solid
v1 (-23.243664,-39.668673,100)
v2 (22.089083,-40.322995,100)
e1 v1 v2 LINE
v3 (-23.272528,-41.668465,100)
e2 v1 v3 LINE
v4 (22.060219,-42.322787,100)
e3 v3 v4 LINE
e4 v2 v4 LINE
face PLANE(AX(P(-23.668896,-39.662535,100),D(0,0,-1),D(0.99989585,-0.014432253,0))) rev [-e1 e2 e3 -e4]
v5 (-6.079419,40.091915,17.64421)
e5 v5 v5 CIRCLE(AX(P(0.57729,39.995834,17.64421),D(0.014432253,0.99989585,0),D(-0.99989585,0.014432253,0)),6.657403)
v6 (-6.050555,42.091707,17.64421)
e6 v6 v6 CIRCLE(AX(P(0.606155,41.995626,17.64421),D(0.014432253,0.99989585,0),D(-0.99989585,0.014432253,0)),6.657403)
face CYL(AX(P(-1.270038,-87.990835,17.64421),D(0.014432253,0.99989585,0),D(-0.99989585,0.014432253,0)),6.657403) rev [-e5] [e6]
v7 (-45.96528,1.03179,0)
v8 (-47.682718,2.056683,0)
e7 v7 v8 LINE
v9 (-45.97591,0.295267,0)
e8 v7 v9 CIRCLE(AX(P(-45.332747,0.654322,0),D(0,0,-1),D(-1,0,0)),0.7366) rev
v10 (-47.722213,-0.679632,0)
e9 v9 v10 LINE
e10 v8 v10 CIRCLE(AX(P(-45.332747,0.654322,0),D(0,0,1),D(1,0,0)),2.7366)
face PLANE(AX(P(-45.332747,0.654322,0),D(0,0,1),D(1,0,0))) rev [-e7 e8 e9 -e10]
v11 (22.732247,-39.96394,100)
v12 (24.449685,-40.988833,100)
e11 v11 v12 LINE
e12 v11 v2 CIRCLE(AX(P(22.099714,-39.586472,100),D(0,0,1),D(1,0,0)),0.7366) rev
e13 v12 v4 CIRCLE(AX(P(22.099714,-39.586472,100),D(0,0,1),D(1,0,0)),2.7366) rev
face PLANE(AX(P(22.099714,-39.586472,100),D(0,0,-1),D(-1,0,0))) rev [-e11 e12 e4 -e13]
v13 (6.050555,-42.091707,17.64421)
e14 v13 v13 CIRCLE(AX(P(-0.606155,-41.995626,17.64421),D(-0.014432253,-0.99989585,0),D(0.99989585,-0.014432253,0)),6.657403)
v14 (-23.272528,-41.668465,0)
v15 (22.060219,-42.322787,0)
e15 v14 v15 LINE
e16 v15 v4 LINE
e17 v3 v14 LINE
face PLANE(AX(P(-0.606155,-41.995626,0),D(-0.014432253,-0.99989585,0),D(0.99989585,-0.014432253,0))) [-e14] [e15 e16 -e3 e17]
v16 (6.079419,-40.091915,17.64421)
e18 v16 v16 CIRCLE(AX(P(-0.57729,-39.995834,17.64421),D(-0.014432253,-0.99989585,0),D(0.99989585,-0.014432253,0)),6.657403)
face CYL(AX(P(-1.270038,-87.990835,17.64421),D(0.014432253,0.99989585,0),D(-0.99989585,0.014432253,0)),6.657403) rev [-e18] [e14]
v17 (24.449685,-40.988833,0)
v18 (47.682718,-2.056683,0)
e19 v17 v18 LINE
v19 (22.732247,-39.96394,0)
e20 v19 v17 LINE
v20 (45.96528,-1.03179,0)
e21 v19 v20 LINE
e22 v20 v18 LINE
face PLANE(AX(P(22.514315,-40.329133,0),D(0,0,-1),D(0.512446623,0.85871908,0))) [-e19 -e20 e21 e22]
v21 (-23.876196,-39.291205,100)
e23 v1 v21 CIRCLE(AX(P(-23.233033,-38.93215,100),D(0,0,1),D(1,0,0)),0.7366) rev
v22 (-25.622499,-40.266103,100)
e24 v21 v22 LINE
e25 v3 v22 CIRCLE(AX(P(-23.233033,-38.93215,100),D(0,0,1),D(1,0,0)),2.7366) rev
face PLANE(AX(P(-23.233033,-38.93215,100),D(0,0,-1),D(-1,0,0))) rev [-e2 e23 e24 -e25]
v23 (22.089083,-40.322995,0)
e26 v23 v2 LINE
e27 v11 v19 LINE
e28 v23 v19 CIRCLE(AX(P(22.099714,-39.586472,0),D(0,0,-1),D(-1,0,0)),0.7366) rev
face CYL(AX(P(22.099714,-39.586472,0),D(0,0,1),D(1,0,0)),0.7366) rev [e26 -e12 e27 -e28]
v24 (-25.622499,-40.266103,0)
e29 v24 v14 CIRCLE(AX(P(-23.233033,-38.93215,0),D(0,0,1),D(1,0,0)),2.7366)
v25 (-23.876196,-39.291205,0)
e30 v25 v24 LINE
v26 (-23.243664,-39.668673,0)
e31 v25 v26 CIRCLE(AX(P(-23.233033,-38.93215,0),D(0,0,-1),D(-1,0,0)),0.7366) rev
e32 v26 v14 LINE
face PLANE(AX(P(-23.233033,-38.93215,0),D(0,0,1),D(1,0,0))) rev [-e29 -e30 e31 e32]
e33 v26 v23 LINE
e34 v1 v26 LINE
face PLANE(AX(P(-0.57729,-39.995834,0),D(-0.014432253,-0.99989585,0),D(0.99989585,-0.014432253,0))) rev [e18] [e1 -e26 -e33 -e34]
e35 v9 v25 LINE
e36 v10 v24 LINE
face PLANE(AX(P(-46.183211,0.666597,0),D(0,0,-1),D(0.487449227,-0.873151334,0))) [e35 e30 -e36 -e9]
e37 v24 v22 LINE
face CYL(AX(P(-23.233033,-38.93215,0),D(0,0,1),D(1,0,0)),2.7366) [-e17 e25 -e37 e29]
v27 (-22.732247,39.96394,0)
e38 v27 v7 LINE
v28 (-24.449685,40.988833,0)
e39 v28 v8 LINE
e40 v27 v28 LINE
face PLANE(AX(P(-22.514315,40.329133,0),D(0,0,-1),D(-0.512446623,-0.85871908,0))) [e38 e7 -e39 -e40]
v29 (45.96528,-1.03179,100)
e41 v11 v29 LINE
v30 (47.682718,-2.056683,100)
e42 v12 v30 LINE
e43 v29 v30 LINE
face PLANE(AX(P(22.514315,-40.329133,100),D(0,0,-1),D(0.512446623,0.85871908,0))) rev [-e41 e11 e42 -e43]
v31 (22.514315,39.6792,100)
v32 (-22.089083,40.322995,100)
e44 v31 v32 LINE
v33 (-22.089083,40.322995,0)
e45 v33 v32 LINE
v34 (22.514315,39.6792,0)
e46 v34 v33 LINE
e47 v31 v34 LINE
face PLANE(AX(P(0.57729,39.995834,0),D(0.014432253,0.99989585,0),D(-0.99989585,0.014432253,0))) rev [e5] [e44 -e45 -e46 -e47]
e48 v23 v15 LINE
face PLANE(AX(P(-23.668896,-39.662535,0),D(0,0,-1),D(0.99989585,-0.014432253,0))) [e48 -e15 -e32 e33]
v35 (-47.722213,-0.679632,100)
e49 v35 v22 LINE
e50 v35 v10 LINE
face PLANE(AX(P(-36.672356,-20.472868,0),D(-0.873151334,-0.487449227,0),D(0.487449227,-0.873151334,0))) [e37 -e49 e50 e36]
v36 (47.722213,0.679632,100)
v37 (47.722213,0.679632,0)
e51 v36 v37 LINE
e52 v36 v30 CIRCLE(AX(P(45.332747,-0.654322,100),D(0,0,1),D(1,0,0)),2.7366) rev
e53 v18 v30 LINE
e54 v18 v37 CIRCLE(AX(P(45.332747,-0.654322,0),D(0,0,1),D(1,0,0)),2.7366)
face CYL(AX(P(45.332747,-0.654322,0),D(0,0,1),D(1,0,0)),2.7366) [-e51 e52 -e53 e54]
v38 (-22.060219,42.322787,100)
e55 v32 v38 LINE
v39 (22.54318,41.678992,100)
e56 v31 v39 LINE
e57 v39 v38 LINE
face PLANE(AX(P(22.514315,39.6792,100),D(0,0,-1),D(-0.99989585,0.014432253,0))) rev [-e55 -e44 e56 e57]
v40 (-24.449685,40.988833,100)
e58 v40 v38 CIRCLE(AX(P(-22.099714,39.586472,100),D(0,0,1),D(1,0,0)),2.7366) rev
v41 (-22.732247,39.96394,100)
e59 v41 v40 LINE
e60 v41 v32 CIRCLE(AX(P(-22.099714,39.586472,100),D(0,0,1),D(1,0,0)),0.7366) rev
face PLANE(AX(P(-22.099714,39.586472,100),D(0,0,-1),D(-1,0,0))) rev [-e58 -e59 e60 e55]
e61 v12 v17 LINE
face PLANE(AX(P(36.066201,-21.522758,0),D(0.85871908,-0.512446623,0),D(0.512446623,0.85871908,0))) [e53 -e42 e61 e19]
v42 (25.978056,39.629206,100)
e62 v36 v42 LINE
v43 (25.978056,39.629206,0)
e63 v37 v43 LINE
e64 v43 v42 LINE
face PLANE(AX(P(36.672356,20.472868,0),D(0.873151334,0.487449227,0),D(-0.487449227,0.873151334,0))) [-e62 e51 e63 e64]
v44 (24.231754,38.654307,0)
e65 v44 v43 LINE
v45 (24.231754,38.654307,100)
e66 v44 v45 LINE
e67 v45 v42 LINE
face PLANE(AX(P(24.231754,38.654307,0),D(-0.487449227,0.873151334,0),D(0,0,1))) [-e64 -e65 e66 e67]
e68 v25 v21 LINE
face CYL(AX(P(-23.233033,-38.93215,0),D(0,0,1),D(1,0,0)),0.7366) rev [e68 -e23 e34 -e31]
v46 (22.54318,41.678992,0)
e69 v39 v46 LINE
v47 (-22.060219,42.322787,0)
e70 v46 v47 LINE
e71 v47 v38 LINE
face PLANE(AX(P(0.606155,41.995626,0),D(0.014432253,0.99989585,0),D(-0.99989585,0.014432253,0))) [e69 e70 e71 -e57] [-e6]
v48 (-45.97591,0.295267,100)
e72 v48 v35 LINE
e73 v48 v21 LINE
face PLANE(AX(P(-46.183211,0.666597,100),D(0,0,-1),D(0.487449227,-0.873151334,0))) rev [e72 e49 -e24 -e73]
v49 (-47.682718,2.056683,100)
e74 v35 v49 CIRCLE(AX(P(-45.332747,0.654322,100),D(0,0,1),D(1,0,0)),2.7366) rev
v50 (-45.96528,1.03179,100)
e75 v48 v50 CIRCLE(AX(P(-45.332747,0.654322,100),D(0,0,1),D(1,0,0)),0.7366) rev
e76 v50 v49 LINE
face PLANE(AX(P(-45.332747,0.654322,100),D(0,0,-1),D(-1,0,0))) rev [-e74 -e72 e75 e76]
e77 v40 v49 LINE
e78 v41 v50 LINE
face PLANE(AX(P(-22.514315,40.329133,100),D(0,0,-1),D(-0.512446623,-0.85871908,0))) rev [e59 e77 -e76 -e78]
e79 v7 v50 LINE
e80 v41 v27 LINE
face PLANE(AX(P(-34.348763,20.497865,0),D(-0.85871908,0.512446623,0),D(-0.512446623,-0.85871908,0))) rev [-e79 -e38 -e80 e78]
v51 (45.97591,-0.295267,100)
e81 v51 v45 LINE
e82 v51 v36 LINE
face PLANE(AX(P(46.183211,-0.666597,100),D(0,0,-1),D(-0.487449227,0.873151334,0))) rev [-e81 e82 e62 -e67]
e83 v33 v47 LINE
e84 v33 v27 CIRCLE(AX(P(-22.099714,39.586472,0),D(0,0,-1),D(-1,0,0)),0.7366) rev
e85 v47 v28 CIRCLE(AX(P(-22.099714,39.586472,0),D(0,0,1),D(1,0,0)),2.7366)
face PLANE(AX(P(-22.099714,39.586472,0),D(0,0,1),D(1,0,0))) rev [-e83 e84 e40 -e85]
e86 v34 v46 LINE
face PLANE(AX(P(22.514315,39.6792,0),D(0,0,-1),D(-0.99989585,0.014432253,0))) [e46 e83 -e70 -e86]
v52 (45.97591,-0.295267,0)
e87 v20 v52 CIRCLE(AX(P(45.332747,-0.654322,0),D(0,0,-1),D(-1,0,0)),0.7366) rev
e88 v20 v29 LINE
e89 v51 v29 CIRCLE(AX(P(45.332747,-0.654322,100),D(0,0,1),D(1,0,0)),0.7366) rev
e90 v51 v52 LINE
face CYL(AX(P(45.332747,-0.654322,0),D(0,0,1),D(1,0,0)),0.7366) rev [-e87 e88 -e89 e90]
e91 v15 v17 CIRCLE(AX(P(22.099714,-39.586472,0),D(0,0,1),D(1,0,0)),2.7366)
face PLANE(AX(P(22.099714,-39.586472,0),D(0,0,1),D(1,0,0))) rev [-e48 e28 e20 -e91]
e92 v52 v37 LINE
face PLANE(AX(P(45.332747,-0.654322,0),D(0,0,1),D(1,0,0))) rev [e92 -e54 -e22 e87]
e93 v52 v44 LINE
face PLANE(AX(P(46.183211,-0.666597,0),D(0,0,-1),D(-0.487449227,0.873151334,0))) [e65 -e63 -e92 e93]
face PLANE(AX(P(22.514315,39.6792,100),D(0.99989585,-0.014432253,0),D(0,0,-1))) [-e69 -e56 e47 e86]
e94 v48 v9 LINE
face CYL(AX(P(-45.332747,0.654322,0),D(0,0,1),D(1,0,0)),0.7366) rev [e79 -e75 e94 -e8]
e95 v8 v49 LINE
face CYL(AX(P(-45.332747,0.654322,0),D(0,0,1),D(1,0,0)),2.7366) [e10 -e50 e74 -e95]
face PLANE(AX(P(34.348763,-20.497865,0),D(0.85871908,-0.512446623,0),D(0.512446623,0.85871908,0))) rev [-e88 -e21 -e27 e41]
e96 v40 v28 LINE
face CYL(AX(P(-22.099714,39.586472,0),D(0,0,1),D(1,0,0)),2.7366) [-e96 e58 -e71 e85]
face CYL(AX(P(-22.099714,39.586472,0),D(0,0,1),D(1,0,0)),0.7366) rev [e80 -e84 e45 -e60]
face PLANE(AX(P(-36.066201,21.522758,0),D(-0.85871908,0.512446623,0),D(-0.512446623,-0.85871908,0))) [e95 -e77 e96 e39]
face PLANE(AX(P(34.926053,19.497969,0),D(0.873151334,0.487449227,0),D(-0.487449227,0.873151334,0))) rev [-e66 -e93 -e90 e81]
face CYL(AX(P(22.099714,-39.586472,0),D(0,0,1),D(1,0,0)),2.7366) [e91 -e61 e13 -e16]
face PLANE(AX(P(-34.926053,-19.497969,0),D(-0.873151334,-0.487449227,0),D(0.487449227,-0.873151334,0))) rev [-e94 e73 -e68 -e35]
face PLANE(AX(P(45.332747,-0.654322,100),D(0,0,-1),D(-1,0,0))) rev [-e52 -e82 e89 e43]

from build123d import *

# Parameters (mm, degrees)
LOFTED_BENDS1_DEPTH = 100
SKETCH8_R           = 6.657402664
CUT_EXTRUDE1_DEPTH  = 130


# Read off the part's stored shape, not the designer's step: Lofted Bends1
with BuildPart() as part:
    # Lofted Bends1 outline → Lofted Bends1 (new body)
    with BuildSketch(Plane.XY):
        with BuildLine():
            Line((47.722213143, 0.679631709), (25.978056207, 39.629205506))
            Line((25.978056207, 39.629205506), (24.23175354, 38.654307053))
            Line((24.23175354, 38.654307053), (45.975910476, -0.295266745))
            ThreePointArc((45.975910476, -0.295266745), (46.069270486, -0.664952643), (45.965279678, -1.031790027))
            Line((45.965279678, -1.031790027), (22.732246736, -39.963939806))
            ThreePointArc((22.732246736, -39.963939806), (22.458769362, -40.229634896), (22.089083464, -40.322994907))
            Line((22.089083464, -40.322994907), (-23.24366374, -39.668673062))
            ThreePointArc((-23.24366374, -39.668673062), (-23.610501124, -39.564682253), (-23.876196214, -39.291204879))
            Line((-23.876196214, -39.291204879), (-45.975910476, 0.295266745))
            ThreePointArc((-45.975910476, 0.295266745), (-46.069270486, 0.664952643), (-45.965279678, 1.031790027))
            Line((-45.965279678, 1.031790027), (-22.732246736, 39.963939806))
            ThreePointArc((-22.732246736, 39.963939806), (-22.458769362, 40.229634896), (-22.089083464, 40.322994907))
            Line((-22.089083464, 40.322994907), (22.514315379, 39.679200299))
            Line((22.514315379, 39.679200299), (22.543179886, 41.678991998))
            Line((22.543179886, 41.678991998), (-22.060218957, 42.322786606))
            ThreePointArc((-22.060218957, 42.322786606), (-23.433667815, 41.975937564), (-24.449684896, 40.988833052))
            Line((-24.449684896, 40.988833052), (-47.682717838, 2.056683273))
            ThreePointArc((-47.682717838, 2.056683273), (-48.069062185, 0.69381715), (-47.722213143, -0.679631709))
            Line((-47.722213143, -0.679631709), (-25.622498881, -40.266103333))
            ThreePointArc((-25.622498881, -40.266103333), (-24.63539437, -41.282120414), (-23.272528247, -41.668464761))
            Line((-23.272528247, -41.668464761), (22.060218957, -42.322786606))
            ThreePointArc((22.060218957, -42.322786606), (23.433667815, -41.975937564), (24.449684896, -40.988833052))
            Line((24.449684896, -40.988833052), (47.682717838, -2.056683273))
            ThreePointArc((47.682717838, -2.056683273), (48.069062185, -0.69381715), (47.722213143, 0.679631709))
        make_face()
    extrude(amount=LOFTED_BENDS1_DEPTH)

    # Sketch8 → Cut-Extrude1 (cut)
    with BuildSketch(Plane(origin=(0.606154645, 41.995625683, 0), x_dir=(0.9998958496065499, -0.014432253448298253, 0), z_dir=(0.014432253448298252, 0.9998958496065498, 0))):
        with Locations((0, -17.644210067)):
            Circle(SKETCH8_R)
    extrude(amount=-CUT_EXTRUDE1_DEPTH, mode=Mode.SUBTRACT)


solid = part.part
